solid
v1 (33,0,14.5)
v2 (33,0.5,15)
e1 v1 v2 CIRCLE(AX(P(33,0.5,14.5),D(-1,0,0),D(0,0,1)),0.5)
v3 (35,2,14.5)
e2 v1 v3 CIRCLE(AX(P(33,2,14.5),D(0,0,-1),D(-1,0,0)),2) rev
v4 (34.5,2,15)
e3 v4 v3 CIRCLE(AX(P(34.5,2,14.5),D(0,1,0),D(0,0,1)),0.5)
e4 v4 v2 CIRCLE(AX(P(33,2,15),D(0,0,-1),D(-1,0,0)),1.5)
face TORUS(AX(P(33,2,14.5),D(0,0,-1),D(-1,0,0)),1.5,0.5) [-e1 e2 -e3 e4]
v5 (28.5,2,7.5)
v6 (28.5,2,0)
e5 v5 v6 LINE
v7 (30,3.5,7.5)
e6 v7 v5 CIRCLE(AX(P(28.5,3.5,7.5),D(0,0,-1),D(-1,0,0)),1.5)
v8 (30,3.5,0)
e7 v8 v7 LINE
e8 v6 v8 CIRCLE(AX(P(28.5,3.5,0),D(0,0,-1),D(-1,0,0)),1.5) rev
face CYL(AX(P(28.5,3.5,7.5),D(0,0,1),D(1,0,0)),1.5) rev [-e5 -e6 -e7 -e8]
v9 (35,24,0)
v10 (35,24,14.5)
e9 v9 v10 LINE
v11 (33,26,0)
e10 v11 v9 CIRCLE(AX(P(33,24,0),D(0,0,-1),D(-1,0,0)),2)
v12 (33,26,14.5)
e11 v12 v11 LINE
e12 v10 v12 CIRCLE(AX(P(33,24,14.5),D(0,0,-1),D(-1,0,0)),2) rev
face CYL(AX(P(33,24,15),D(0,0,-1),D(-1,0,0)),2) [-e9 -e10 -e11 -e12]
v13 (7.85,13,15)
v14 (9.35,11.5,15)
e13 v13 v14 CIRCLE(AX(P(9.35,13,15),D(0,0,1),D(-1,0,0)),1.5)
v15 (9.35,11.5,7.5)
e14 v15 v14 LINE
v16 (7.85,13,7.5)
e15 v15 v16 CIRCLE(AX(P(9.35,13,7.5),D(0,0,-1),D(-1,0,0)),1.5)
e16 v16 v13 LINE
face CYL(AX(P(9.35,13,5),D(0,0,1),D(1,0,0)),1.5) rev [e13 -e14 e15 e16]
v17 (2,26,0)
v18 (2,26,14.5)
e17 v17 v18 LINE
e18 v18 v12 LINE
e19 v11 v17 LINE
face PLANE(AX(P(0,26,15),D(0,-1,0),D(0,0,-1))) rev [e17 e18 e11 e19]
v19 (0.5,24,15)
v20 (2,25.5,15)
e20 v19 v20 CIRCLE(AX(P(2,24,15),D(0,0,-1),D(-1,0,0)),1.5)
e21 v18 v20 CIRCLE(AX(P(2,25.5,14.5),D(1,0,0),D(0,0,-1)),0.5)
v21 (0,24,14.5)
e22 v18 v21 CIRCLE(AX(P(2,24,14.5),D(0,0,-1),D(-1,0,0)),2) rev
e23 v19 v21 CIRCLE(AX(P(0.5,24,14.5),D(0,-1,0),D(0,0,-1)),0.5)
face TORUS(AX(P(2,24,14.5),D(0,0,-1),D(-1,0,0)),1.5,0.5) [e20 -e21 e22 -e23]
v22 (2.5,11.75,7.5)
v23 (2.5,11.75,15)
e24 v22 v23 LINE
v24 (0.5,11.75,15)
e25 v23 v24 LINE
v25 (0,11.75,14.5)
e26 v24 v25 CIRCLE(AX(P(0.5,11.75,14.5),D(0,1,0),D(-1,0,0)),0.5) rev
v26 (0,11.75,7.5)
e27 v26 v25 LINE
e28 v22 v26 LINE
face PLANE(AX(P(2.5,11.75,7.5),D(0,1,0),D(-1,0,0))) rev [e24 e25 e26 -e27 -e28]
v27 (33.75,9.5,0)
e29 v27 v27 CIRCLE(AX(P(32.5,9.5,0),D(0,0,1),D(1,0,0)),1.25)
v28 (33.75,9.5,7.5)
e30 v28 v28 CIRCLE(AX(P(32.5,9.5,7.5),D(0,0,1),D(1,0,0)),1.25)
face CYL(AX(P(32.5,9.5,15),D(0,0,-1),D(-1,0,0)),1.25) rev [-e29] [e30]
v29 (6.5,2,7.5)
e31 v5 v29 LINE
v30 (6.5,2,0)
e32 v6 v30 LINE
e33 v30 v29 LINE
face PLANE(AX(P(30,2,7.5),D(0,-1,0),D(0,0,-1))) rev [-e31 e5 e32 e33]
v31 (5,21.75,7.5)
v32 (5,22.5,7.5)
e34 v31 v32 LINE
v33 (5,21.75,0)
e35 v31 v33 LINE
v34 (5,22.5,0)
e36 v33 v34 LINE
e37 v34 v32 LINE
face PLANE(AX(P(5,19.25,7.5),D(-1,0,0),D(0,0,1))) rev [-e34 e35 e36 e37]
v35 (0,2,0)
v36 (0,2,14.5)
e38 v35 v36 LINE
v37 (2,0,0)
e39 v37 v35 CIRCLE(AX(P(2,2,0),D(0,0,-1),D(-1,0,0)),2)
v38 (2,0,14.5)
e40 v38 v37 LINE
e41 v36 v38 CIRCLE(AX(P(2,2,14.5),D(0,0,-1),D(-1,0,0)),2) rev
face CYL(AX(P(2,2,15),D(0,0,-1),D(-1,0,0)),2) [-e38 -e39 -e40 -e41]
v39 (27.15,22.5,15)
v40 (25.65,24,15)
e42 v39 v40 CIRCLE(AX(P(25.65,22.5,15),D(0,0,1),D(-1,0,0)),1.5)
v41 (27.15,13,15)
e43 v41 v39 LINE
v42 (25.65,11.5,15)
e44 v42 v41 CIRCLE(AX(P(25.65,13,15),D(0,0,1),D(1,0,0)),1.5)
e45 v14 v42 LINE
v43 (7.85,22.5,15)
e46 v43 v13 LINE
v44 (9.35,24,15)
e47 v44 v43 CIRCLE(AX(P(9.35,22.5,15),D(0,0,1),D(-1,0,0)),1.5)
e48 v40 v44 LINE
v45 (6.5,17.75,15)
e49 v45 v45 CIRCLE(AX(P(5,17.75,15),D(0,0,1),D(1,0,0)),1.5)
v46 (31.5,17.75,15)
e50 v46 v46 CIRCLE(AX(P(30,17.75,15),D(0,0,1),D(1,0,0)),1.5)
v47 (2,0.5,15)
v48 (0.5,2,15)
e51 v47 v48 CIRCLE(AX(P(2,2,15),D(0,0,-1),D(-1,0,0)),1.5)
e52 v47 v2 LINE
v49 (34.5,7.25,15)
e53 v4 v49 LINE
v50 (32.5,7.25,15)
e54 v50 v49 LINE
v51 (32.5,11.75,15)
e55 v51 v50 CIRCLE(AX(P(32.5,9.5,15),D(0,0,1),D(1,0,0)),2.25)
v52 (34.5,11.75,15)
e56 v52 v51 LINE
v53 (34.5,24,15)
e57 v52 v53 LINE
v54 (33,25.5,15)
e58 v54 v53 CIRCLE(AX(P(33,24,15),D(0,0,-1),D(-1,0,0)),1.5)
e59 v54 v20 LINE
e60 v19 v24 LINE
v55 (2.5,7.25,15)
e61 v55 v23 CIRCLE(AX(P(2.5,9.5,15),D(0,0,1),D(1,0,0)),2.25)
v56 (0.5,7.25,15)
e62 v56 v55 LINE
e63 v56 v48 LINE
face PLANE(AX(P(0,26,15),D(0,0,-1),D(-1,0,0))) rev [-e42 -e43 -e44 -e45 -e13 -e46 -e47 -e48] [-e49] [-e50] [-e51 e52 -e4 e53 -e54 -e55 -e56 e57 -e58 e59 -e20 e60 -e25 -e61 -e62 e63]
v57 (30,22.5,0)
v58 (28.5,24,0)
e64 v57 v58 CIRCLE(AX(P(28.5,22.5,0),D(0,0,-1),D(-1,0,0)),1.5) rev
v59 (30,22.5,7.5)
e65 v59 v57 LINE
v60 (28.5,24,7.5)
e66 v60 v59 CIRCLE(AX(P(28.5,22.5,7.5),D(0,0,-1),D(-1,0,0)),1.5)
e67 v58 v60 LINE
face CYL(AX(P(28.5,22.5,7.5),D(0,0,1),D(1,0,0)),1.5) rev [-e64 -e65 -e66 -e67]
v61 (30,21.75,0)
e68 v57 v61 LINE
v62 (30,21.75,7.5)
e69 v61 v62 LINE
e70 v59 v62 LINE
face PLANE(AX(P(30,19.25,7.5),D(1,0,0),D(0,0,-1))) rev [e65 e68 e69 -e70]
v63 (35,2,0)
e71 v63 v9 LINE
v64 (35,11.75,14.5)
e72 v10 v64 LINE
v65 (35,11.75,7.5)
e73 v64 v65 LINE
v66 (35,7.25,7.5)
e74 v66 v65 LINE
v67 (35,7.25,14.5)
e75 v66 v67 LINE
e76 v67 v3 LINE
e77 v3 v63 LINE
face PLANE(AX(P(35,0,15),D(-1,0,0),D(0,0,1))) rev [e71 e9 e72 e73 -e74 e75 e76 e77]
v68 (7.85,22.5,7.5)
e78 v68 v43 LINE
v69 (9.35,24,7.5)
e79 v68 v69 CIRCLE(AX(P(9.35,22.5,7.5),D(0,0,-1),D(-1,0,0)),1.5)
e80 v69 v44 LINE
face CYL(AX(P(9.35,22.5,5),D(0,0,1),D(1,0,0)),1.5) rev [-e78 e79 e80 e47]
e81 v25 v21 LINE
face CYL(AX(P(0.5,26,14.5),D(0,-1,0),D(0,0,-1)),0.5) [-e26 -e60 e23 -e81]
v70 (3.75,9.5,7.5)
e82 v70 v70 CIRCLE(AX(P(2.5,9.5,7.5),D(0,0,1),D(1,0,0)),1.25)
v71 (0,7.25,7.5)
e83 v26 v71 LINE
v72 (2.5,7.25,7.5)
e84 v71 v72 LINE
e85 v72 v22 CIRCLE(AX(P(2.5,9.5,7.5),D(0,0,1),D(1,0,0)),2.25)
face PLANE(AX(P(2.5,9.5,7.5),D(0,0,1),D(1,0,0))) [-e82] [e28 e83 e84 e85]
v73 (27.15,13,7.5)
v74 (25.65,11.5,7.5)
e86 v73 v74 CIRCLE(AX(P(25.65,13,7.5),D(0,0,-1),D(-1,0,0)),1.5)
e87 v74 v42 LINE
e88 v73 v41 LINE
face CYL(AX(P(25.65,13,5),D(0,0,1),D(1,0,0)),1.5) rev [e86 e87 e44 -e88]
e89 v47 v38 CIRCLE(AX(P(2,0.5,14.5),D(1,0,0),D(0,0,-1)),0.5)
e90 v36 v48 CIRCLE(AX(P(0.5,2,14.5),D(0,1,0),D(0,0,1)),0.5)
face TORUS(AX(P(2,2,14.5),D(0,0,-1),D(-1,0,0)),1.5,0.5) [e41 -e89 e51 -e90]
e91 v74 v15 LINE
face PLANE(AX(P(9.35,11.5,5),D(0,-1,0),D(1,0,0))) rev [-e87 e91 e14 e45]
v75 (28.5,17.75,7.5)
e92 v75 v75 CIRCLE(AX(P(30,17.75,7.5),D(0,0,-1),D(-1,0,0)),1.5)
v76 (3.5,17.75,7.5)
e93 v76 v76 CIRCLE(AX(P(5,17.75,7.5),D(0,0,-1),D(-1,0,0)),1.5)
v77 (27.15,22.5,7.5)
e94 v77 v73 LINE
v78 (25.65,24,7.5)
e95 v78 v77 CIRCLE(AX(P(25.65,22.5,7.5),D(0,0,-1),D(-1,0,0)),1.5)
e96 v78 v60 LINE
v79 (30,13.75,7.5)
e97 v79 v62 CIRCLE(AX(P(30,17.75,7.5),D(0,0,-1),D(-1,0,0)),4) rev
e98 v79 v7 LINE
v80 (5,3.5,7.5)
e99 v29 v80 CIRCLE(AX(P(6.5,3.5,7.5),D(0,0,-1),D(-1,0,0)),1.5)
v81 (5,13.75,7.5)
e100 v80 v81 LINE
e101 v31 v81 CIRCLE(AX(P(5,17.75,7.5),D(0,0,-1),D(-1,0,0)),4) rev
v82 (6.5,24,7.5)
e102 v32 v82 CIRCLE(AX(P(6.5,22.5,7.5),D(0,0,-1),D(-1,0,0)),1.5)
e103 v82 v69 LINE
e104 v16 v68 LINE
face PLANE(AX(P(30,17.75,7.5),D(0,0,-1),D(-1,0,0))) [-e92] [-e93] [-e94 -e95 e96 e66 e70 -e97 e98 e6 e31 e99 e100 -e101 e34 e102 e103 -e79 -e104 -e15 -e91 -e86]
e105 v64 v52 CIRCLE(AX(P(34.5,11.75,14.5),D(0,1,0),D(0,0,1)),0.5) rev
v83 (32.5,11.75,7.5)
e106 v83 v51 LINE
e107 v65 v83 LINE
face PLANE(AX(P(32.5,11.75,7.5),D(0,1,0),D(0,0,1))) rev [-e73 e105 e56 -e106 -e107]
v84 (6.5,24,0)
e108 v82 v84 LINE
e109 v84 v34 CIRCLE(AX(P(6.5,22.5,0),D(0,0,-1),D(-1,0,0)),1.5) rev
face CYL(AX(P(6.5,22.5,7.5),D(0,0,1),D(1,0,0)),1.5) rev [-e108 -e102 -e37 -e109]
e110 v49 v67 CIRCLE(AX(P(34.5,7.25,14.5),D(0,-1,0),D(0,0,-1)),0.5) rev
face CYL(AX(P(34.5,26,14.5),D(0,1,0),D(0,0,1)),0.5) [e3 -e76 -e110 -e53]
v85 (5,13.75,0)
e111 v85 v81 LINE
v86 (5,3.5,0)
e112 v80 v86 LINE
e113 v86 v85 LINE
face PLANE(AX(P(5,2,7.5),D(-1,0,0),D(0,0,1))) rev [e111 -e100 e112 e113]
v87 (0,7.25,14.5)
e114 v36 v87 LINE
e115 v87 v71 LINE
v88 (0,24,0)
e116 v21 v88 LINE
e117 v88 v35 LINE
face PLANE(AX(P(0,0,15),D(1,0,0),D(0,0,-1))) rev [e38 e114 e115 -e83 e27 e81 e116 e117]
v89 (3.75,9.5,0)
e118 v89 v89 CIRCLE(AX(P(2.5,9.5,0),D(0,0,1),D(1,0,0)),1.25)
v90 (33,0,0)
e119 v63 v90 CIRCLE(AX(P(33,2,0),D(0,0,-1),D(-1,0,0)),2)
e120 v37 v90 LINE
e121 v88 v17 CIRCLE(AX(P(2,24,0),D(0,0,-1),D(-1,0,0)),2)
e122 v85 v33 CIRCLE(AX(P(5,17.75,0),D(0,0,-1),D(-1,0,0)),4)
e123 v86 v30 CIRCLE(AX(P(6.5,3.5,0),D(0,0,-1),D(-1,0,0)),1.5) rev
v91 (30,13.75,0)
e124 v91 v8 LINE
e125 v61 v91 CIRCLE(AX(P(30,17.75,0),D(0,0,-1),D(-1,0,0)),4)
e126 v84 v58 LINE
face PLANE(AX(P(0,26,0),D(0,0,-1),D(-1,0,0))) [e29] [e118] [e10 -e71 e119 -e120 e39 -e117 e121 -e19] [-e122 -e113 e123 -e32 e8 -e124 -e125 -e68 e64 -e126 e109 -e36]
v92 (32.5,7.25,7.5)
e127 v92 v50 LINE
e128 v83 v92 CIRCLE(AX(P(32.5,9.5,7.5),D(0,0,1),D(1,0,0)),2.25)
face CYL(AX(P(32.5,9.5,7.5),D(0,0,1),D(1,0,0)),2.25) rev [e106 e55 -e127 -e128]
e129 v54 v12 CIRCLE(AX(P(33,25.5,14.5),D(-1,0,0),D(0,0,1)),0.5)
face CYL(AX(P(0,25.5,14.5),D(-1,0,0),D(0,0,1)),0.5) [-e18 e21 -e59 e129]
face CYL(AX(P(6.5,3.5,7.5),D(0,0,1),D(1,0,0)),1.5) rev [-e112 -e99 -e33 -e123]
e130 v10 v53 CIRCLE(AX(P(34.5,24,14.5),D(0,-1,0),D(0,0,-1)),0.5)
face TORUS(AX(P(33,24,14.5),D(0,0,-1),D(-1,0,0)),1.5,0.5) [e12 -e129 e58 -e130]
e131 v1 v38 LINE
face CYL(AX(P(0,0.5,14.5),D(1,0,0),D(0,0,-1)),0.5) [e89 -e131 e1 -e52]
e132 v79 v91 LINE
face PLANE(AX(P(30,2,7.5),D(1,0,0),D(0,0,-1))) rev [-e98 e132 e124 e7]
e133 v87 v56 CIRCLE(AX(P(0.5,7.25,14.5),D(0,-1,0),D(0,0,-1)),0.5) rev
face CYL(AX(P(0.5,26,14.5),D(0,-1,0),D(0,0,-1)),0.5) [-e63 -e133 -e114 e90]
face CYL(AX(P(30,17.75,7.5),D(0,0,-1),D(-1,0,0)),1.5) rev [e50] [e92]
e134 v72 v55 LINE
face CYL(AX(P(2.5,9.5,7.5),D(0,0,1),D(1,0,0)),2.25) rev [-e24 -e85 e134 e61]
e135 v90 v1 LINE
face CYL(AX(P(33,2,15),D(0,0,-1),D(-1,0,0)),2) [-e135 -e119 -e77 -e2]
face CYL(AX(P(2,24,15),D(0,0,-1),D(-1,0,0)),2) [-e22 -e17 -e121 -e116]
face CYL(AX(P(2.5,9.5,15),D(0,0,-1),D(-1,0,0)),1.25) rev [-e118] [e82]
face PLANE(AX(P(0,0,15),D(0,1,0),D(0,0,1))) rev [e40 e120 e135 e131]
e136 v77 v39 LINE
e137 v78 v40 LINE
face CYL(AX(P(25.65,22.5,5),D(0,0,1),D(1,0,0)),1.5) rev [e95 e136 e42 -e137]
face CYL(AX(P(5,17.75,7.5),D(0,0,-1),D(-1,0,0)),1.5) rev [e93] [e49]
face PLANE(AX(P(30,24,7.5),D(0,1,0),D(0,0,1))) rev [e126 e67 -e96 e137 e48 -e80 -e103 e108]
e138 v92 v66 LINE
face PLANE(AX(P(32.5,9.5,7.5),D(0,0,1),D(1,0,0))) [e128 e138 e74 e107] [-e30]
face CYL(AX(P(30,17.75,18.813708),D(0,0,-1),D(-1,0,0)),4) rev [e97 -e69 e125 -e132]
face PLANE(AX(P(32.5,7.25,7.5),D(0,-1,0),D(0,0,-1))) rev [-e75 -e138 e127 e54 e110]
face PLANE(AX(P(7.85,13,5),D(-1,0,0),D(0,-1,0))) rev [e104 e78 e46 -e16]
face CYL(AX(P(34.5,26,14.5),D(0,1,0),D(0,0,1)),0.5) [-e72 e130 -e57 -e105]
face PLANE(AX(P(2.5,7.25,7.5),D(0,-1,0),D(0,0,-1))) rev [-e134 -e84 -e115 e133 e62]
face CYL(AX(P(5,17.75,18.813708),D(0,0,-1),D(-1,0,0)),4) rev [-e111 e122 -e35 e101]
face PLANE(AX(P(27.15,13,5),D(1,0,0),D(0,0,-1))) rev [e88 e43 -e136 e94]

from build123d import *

# Parameters (mm, degrees)
SKETCH_1_W          = 35
SKETCH_1_H          = 26
SKETCH_1_R          = 1.25
EXTRUDE_1_DEPTH     = 15
CUT_EXTRUDE_1_DEPTH = 7.5
FILLET_1_R          = 1.5
FILLET_2_R          = 0.5
CUT_EXTRUDE_START   = -10
SKETCH_8_R          = 1.5
CUT_EXTRUDE_5_DEPTH = 10
CUT_EXTRUDE_6_DEPTH = 7.5
FILLET_3_R          = 2
SKETCH_10_R         = 4
CUT_EXTRUDE_7_DEPTH = 7.5


with BuildPart() as part:
    # Эскиз1 → Вытянуть1 (new body)
    with BuildSketch(Plane.XY):
        with Locations((17.5, 13)):
            Rectangle(SKETCH_1_W, SKETCH_1_H)
        with Locations((2.5, 9.5)):
            Circle(SKETCH_1_R, mode=Mode.SUBTRACT)
        with Locations((32.5, 9.5)):
            Circle(SKETCH_1_R, mode=Mode.SUBTRACT)
    extrude(amount=EXTRUDE_1_DEPTH)

    # Эскиз2 → Вырез-Вытянуть1 (cut)
    with BuildSketch(Plane(origin=(0, 0, 0), x_dir=(-1, 0, 0), z_dir=(0, 0, -1))):
        with BuildLine():
            Line((-30, 2), (-5, 2))
            Line((-5, 2), (-5, 16.25))
            ThreePointArc((-5, 16.25), (-3.5, 17.75), (-5, 19.25))
            Line((-5, 19.25), (-5, 24))
            Line((-5, 24), (-30, 24))
            Line((-30, 24), (-30, 19.25))
            ThreePointArc((-30, 19.25), (-31.5, 17.75), (-30, 16.25))
            Line((-30, 16.25), (-30, 2))
        make_face()
    extrude(amount=-CUT_EXTRUDE_1_DEPTH, mode=Mode.SUBTRACT)

    # Скругление1
    fillet_1_edges = [part.edges().sort_by_distance(p)[0] for p in [
        (30, 24, 3.75),
        (5, 24, 3.75),
        (5, 2, 3.75),
        (30, 2, 3.75),
    ]]
    fillet(fillet_1_edges, radius=FILLET_1_R)

    # Скругление2
    fillet_2_edges = [part.edges().sort_by_distance(p)[0] for p in [
        (17.5, 0, 15),
        (0, 13, 15),
        (35, 13, 15),
        (17.5, 26, 15),
    ]]
    fillet(fillet_2_edges, radius=FILLET_2_R)

    # Эскиз8 → Вырез-Вытянуть5 (cut)
    with BuildSketch(Plane.XY.offset(15).offset(CUT_EXTRUDE_START)):
        with Locations(Location((5, 17.75, 0), (0, 0, 180))):
            Circle(SKETCH_8_R)
        with Locations(Location((30, 17.75, 0), (0, 0, 180))):
            Circle(SKETCH_8_R)
        with BuildLine():
            Line((9.35, 11.5), (25.65, 11.5))
            ThreePointArc((25.65, 11.5), (26.710660172, 11.939339828), (27.15, 13))
            Line((27.15, 13), (27.15, 22.5))
            ThreePointArc((27.15, 22.5), (26.710660172, 23.560660172), (25.65, 24))
            Line((25.65, 24), (9.35, 24))
            ThreePointArc((9.35, 24), (8.289339828, 23.560660172), (7.85, 22.5))
            Line((7.85, 22.5), (7.85, 13))
            ThreePointArc((7.85, 13), (8.289339828, 11.939339828), (9.35, 11.5))
        make_face()
    extrude(amount=CUT_EXTRUDE_5_DEPTH, mode=Mode.SUBTRACT)

    # Эскиз9 → Вырез-Вытянуть6 (cut)
    with BuildSketch(Plane.XY.offset(15)):
        with BuildLine():
            Line((2.5, 7.25), (-1.280678269, 7.25))
            Line((-1.280678269, 7.25), (-1.280678269, 11.75))
            Line((-1.280678269, 11.75), (2.5, 11.75))
            ThreePointArc((2.5, 11.75), (4.75, 9.5), (2.5, 7.25))
        make_face()
        with BuildLine():
            Line((32.5, 7.25), (36.280678269, 7.25))
            Line((36.280678269, 7.25), (36.280678269, 11.75))
            Line((36.280678269, 11.75), (32.5, 11.75))
            ThreePointArc((32.5, 11.75), (30.25, 9.5), (32.5, 7.25))
        make_face()
    extrude(amount=-CUT_EXTRUDE_6_DEPTH, mode=Mode.SUBTRACT)

    # Скругление3
    # the kernel refuses this fillet: 2 mm, written as the material it takes off along each edge
    with BuildSketch(Plane(origin=(33, 24, 15), x_dir=(1, 0, 0), z_dir=(0, -1, 0))) as fillet_3_piece_1:
        with BuildLine():
            CenterArc((1.5, -0.5), 0.5, 0, 90)
            Line((2, -0.5), (2, 0))
            Line((2, 0), (1.5, 0))
        make_face()
    revolve(axis=Axis((33, 24, 15), (0, 0, 1)), revolution_arc=90, mode=Mode.SUBTRACT)
    with BuildSketch(Plane(origin=(2, 24, 15), x_dir=(0, 1, 0), z_dir=(1, 0, 0))) as fillet_3_piece_2:
        with BuildLine():
            CenterArc((1.5, -0.5), 0.5, 0, 90)
            Line((2, -0.5), (2, 0))
            Line((2, 0), (1.5, 0))
        make_face()
    revolve(axis=Axis((2, 24, 15), (0, 0, 1)), revolution_arc=90, mode=Mode.SUBTRACT)
    with BuildSketch(Plane(origin=(33, 2, 15), x_dir=(0, -1, 0), z_dir=(-1, 0, 0))) as fillet_3_piece_3:
        with BuildLine():
            CenterArc((1.5, -0.5), 0.5, 0, 90)
            Line((2, -0.5), (2, 0))
            Line((2, 0), (1.5, 0))
        make_face()
    revolve(axis=Axis((33, 2, 15), (0, 0, 1)), revolution_arc=90, mode=Mode.SUBTRACT)
    with BuildSketch(Plane(origin=(2, 2, 15), x_dir=(-1, 0, 0), z_dir=(0, 1, 0))) as fillet_3_piece_4:
        with BuildLine():
            CenterArc((1.5, -0.5), 0.5, 0, 90)
            Line((2, -0.5), (2, 0))
            Line((2, 0), (1.5, 0))
        make_face()
    revolve(axis=Axis((2, 2, 15), (0, 0, 1)), revolution_arc=90, mode=Mode.SUBTRACT)
    with BuildSketch(Plane(origin=(0, 0, -5), x_dir=(1, 0, 0), z_dir=(0, 0, 1)), Plane(origin=(0, 26, -5), x_dir=(0, -1, 0), z_dir=(0, 0, 1))) as fillet_3_piece_5:
        with BuildLine():
            CenterArc((FILLET_3_R, FILLET_3_R), FILLET_3_R, 180, 90)
            Line((0, FILLET_3_R), (0, 0))
            Line((0, 0), (FILLET_3_R, 0))
        make_face()
    extrude(amount=20, mode=Mode.SUBTRACT)
    with BuildSketch(Plane(origin=(35, 0, -5), x_dir=(-1, 0, 0), z_dir=(0, 0, 1)), Plane(origin=(35, 26, -5), x_dir=(0, -1, 0), z_dir=(0, 0, 1))) as fillet_3_piece_6:
        with BuildLine():
            CenterArc((FILLET_3_R, -FILLET_3_R), FILLET_3_R, 90, 90)
            Line((0, -FILLET_3_R), (0, 0))
            Line((0, 0), (FILLET_3_R, 0))
        make_face()
    extrude(amount=20, mode=Mode.SUBTRACT)

    # Эскиз10 → Вырез-Вытянуть7 (cut)
    with BuildSketch(Plane(origin=(0, 0, 0), x_dir=(-1, 0, 0), z_dir=(0, 0, -1))):
        with Locations((-5, 17.75)):
            Circle(SKETCH_10_R)
        with Locations((-30, 17.75)):
            Circle(SKETCH_10_R)
    extrude(amount=-CUT_EXTRUDE_7_DEPTH, mode=Mode.SUBTRACT)


solid = part.part
